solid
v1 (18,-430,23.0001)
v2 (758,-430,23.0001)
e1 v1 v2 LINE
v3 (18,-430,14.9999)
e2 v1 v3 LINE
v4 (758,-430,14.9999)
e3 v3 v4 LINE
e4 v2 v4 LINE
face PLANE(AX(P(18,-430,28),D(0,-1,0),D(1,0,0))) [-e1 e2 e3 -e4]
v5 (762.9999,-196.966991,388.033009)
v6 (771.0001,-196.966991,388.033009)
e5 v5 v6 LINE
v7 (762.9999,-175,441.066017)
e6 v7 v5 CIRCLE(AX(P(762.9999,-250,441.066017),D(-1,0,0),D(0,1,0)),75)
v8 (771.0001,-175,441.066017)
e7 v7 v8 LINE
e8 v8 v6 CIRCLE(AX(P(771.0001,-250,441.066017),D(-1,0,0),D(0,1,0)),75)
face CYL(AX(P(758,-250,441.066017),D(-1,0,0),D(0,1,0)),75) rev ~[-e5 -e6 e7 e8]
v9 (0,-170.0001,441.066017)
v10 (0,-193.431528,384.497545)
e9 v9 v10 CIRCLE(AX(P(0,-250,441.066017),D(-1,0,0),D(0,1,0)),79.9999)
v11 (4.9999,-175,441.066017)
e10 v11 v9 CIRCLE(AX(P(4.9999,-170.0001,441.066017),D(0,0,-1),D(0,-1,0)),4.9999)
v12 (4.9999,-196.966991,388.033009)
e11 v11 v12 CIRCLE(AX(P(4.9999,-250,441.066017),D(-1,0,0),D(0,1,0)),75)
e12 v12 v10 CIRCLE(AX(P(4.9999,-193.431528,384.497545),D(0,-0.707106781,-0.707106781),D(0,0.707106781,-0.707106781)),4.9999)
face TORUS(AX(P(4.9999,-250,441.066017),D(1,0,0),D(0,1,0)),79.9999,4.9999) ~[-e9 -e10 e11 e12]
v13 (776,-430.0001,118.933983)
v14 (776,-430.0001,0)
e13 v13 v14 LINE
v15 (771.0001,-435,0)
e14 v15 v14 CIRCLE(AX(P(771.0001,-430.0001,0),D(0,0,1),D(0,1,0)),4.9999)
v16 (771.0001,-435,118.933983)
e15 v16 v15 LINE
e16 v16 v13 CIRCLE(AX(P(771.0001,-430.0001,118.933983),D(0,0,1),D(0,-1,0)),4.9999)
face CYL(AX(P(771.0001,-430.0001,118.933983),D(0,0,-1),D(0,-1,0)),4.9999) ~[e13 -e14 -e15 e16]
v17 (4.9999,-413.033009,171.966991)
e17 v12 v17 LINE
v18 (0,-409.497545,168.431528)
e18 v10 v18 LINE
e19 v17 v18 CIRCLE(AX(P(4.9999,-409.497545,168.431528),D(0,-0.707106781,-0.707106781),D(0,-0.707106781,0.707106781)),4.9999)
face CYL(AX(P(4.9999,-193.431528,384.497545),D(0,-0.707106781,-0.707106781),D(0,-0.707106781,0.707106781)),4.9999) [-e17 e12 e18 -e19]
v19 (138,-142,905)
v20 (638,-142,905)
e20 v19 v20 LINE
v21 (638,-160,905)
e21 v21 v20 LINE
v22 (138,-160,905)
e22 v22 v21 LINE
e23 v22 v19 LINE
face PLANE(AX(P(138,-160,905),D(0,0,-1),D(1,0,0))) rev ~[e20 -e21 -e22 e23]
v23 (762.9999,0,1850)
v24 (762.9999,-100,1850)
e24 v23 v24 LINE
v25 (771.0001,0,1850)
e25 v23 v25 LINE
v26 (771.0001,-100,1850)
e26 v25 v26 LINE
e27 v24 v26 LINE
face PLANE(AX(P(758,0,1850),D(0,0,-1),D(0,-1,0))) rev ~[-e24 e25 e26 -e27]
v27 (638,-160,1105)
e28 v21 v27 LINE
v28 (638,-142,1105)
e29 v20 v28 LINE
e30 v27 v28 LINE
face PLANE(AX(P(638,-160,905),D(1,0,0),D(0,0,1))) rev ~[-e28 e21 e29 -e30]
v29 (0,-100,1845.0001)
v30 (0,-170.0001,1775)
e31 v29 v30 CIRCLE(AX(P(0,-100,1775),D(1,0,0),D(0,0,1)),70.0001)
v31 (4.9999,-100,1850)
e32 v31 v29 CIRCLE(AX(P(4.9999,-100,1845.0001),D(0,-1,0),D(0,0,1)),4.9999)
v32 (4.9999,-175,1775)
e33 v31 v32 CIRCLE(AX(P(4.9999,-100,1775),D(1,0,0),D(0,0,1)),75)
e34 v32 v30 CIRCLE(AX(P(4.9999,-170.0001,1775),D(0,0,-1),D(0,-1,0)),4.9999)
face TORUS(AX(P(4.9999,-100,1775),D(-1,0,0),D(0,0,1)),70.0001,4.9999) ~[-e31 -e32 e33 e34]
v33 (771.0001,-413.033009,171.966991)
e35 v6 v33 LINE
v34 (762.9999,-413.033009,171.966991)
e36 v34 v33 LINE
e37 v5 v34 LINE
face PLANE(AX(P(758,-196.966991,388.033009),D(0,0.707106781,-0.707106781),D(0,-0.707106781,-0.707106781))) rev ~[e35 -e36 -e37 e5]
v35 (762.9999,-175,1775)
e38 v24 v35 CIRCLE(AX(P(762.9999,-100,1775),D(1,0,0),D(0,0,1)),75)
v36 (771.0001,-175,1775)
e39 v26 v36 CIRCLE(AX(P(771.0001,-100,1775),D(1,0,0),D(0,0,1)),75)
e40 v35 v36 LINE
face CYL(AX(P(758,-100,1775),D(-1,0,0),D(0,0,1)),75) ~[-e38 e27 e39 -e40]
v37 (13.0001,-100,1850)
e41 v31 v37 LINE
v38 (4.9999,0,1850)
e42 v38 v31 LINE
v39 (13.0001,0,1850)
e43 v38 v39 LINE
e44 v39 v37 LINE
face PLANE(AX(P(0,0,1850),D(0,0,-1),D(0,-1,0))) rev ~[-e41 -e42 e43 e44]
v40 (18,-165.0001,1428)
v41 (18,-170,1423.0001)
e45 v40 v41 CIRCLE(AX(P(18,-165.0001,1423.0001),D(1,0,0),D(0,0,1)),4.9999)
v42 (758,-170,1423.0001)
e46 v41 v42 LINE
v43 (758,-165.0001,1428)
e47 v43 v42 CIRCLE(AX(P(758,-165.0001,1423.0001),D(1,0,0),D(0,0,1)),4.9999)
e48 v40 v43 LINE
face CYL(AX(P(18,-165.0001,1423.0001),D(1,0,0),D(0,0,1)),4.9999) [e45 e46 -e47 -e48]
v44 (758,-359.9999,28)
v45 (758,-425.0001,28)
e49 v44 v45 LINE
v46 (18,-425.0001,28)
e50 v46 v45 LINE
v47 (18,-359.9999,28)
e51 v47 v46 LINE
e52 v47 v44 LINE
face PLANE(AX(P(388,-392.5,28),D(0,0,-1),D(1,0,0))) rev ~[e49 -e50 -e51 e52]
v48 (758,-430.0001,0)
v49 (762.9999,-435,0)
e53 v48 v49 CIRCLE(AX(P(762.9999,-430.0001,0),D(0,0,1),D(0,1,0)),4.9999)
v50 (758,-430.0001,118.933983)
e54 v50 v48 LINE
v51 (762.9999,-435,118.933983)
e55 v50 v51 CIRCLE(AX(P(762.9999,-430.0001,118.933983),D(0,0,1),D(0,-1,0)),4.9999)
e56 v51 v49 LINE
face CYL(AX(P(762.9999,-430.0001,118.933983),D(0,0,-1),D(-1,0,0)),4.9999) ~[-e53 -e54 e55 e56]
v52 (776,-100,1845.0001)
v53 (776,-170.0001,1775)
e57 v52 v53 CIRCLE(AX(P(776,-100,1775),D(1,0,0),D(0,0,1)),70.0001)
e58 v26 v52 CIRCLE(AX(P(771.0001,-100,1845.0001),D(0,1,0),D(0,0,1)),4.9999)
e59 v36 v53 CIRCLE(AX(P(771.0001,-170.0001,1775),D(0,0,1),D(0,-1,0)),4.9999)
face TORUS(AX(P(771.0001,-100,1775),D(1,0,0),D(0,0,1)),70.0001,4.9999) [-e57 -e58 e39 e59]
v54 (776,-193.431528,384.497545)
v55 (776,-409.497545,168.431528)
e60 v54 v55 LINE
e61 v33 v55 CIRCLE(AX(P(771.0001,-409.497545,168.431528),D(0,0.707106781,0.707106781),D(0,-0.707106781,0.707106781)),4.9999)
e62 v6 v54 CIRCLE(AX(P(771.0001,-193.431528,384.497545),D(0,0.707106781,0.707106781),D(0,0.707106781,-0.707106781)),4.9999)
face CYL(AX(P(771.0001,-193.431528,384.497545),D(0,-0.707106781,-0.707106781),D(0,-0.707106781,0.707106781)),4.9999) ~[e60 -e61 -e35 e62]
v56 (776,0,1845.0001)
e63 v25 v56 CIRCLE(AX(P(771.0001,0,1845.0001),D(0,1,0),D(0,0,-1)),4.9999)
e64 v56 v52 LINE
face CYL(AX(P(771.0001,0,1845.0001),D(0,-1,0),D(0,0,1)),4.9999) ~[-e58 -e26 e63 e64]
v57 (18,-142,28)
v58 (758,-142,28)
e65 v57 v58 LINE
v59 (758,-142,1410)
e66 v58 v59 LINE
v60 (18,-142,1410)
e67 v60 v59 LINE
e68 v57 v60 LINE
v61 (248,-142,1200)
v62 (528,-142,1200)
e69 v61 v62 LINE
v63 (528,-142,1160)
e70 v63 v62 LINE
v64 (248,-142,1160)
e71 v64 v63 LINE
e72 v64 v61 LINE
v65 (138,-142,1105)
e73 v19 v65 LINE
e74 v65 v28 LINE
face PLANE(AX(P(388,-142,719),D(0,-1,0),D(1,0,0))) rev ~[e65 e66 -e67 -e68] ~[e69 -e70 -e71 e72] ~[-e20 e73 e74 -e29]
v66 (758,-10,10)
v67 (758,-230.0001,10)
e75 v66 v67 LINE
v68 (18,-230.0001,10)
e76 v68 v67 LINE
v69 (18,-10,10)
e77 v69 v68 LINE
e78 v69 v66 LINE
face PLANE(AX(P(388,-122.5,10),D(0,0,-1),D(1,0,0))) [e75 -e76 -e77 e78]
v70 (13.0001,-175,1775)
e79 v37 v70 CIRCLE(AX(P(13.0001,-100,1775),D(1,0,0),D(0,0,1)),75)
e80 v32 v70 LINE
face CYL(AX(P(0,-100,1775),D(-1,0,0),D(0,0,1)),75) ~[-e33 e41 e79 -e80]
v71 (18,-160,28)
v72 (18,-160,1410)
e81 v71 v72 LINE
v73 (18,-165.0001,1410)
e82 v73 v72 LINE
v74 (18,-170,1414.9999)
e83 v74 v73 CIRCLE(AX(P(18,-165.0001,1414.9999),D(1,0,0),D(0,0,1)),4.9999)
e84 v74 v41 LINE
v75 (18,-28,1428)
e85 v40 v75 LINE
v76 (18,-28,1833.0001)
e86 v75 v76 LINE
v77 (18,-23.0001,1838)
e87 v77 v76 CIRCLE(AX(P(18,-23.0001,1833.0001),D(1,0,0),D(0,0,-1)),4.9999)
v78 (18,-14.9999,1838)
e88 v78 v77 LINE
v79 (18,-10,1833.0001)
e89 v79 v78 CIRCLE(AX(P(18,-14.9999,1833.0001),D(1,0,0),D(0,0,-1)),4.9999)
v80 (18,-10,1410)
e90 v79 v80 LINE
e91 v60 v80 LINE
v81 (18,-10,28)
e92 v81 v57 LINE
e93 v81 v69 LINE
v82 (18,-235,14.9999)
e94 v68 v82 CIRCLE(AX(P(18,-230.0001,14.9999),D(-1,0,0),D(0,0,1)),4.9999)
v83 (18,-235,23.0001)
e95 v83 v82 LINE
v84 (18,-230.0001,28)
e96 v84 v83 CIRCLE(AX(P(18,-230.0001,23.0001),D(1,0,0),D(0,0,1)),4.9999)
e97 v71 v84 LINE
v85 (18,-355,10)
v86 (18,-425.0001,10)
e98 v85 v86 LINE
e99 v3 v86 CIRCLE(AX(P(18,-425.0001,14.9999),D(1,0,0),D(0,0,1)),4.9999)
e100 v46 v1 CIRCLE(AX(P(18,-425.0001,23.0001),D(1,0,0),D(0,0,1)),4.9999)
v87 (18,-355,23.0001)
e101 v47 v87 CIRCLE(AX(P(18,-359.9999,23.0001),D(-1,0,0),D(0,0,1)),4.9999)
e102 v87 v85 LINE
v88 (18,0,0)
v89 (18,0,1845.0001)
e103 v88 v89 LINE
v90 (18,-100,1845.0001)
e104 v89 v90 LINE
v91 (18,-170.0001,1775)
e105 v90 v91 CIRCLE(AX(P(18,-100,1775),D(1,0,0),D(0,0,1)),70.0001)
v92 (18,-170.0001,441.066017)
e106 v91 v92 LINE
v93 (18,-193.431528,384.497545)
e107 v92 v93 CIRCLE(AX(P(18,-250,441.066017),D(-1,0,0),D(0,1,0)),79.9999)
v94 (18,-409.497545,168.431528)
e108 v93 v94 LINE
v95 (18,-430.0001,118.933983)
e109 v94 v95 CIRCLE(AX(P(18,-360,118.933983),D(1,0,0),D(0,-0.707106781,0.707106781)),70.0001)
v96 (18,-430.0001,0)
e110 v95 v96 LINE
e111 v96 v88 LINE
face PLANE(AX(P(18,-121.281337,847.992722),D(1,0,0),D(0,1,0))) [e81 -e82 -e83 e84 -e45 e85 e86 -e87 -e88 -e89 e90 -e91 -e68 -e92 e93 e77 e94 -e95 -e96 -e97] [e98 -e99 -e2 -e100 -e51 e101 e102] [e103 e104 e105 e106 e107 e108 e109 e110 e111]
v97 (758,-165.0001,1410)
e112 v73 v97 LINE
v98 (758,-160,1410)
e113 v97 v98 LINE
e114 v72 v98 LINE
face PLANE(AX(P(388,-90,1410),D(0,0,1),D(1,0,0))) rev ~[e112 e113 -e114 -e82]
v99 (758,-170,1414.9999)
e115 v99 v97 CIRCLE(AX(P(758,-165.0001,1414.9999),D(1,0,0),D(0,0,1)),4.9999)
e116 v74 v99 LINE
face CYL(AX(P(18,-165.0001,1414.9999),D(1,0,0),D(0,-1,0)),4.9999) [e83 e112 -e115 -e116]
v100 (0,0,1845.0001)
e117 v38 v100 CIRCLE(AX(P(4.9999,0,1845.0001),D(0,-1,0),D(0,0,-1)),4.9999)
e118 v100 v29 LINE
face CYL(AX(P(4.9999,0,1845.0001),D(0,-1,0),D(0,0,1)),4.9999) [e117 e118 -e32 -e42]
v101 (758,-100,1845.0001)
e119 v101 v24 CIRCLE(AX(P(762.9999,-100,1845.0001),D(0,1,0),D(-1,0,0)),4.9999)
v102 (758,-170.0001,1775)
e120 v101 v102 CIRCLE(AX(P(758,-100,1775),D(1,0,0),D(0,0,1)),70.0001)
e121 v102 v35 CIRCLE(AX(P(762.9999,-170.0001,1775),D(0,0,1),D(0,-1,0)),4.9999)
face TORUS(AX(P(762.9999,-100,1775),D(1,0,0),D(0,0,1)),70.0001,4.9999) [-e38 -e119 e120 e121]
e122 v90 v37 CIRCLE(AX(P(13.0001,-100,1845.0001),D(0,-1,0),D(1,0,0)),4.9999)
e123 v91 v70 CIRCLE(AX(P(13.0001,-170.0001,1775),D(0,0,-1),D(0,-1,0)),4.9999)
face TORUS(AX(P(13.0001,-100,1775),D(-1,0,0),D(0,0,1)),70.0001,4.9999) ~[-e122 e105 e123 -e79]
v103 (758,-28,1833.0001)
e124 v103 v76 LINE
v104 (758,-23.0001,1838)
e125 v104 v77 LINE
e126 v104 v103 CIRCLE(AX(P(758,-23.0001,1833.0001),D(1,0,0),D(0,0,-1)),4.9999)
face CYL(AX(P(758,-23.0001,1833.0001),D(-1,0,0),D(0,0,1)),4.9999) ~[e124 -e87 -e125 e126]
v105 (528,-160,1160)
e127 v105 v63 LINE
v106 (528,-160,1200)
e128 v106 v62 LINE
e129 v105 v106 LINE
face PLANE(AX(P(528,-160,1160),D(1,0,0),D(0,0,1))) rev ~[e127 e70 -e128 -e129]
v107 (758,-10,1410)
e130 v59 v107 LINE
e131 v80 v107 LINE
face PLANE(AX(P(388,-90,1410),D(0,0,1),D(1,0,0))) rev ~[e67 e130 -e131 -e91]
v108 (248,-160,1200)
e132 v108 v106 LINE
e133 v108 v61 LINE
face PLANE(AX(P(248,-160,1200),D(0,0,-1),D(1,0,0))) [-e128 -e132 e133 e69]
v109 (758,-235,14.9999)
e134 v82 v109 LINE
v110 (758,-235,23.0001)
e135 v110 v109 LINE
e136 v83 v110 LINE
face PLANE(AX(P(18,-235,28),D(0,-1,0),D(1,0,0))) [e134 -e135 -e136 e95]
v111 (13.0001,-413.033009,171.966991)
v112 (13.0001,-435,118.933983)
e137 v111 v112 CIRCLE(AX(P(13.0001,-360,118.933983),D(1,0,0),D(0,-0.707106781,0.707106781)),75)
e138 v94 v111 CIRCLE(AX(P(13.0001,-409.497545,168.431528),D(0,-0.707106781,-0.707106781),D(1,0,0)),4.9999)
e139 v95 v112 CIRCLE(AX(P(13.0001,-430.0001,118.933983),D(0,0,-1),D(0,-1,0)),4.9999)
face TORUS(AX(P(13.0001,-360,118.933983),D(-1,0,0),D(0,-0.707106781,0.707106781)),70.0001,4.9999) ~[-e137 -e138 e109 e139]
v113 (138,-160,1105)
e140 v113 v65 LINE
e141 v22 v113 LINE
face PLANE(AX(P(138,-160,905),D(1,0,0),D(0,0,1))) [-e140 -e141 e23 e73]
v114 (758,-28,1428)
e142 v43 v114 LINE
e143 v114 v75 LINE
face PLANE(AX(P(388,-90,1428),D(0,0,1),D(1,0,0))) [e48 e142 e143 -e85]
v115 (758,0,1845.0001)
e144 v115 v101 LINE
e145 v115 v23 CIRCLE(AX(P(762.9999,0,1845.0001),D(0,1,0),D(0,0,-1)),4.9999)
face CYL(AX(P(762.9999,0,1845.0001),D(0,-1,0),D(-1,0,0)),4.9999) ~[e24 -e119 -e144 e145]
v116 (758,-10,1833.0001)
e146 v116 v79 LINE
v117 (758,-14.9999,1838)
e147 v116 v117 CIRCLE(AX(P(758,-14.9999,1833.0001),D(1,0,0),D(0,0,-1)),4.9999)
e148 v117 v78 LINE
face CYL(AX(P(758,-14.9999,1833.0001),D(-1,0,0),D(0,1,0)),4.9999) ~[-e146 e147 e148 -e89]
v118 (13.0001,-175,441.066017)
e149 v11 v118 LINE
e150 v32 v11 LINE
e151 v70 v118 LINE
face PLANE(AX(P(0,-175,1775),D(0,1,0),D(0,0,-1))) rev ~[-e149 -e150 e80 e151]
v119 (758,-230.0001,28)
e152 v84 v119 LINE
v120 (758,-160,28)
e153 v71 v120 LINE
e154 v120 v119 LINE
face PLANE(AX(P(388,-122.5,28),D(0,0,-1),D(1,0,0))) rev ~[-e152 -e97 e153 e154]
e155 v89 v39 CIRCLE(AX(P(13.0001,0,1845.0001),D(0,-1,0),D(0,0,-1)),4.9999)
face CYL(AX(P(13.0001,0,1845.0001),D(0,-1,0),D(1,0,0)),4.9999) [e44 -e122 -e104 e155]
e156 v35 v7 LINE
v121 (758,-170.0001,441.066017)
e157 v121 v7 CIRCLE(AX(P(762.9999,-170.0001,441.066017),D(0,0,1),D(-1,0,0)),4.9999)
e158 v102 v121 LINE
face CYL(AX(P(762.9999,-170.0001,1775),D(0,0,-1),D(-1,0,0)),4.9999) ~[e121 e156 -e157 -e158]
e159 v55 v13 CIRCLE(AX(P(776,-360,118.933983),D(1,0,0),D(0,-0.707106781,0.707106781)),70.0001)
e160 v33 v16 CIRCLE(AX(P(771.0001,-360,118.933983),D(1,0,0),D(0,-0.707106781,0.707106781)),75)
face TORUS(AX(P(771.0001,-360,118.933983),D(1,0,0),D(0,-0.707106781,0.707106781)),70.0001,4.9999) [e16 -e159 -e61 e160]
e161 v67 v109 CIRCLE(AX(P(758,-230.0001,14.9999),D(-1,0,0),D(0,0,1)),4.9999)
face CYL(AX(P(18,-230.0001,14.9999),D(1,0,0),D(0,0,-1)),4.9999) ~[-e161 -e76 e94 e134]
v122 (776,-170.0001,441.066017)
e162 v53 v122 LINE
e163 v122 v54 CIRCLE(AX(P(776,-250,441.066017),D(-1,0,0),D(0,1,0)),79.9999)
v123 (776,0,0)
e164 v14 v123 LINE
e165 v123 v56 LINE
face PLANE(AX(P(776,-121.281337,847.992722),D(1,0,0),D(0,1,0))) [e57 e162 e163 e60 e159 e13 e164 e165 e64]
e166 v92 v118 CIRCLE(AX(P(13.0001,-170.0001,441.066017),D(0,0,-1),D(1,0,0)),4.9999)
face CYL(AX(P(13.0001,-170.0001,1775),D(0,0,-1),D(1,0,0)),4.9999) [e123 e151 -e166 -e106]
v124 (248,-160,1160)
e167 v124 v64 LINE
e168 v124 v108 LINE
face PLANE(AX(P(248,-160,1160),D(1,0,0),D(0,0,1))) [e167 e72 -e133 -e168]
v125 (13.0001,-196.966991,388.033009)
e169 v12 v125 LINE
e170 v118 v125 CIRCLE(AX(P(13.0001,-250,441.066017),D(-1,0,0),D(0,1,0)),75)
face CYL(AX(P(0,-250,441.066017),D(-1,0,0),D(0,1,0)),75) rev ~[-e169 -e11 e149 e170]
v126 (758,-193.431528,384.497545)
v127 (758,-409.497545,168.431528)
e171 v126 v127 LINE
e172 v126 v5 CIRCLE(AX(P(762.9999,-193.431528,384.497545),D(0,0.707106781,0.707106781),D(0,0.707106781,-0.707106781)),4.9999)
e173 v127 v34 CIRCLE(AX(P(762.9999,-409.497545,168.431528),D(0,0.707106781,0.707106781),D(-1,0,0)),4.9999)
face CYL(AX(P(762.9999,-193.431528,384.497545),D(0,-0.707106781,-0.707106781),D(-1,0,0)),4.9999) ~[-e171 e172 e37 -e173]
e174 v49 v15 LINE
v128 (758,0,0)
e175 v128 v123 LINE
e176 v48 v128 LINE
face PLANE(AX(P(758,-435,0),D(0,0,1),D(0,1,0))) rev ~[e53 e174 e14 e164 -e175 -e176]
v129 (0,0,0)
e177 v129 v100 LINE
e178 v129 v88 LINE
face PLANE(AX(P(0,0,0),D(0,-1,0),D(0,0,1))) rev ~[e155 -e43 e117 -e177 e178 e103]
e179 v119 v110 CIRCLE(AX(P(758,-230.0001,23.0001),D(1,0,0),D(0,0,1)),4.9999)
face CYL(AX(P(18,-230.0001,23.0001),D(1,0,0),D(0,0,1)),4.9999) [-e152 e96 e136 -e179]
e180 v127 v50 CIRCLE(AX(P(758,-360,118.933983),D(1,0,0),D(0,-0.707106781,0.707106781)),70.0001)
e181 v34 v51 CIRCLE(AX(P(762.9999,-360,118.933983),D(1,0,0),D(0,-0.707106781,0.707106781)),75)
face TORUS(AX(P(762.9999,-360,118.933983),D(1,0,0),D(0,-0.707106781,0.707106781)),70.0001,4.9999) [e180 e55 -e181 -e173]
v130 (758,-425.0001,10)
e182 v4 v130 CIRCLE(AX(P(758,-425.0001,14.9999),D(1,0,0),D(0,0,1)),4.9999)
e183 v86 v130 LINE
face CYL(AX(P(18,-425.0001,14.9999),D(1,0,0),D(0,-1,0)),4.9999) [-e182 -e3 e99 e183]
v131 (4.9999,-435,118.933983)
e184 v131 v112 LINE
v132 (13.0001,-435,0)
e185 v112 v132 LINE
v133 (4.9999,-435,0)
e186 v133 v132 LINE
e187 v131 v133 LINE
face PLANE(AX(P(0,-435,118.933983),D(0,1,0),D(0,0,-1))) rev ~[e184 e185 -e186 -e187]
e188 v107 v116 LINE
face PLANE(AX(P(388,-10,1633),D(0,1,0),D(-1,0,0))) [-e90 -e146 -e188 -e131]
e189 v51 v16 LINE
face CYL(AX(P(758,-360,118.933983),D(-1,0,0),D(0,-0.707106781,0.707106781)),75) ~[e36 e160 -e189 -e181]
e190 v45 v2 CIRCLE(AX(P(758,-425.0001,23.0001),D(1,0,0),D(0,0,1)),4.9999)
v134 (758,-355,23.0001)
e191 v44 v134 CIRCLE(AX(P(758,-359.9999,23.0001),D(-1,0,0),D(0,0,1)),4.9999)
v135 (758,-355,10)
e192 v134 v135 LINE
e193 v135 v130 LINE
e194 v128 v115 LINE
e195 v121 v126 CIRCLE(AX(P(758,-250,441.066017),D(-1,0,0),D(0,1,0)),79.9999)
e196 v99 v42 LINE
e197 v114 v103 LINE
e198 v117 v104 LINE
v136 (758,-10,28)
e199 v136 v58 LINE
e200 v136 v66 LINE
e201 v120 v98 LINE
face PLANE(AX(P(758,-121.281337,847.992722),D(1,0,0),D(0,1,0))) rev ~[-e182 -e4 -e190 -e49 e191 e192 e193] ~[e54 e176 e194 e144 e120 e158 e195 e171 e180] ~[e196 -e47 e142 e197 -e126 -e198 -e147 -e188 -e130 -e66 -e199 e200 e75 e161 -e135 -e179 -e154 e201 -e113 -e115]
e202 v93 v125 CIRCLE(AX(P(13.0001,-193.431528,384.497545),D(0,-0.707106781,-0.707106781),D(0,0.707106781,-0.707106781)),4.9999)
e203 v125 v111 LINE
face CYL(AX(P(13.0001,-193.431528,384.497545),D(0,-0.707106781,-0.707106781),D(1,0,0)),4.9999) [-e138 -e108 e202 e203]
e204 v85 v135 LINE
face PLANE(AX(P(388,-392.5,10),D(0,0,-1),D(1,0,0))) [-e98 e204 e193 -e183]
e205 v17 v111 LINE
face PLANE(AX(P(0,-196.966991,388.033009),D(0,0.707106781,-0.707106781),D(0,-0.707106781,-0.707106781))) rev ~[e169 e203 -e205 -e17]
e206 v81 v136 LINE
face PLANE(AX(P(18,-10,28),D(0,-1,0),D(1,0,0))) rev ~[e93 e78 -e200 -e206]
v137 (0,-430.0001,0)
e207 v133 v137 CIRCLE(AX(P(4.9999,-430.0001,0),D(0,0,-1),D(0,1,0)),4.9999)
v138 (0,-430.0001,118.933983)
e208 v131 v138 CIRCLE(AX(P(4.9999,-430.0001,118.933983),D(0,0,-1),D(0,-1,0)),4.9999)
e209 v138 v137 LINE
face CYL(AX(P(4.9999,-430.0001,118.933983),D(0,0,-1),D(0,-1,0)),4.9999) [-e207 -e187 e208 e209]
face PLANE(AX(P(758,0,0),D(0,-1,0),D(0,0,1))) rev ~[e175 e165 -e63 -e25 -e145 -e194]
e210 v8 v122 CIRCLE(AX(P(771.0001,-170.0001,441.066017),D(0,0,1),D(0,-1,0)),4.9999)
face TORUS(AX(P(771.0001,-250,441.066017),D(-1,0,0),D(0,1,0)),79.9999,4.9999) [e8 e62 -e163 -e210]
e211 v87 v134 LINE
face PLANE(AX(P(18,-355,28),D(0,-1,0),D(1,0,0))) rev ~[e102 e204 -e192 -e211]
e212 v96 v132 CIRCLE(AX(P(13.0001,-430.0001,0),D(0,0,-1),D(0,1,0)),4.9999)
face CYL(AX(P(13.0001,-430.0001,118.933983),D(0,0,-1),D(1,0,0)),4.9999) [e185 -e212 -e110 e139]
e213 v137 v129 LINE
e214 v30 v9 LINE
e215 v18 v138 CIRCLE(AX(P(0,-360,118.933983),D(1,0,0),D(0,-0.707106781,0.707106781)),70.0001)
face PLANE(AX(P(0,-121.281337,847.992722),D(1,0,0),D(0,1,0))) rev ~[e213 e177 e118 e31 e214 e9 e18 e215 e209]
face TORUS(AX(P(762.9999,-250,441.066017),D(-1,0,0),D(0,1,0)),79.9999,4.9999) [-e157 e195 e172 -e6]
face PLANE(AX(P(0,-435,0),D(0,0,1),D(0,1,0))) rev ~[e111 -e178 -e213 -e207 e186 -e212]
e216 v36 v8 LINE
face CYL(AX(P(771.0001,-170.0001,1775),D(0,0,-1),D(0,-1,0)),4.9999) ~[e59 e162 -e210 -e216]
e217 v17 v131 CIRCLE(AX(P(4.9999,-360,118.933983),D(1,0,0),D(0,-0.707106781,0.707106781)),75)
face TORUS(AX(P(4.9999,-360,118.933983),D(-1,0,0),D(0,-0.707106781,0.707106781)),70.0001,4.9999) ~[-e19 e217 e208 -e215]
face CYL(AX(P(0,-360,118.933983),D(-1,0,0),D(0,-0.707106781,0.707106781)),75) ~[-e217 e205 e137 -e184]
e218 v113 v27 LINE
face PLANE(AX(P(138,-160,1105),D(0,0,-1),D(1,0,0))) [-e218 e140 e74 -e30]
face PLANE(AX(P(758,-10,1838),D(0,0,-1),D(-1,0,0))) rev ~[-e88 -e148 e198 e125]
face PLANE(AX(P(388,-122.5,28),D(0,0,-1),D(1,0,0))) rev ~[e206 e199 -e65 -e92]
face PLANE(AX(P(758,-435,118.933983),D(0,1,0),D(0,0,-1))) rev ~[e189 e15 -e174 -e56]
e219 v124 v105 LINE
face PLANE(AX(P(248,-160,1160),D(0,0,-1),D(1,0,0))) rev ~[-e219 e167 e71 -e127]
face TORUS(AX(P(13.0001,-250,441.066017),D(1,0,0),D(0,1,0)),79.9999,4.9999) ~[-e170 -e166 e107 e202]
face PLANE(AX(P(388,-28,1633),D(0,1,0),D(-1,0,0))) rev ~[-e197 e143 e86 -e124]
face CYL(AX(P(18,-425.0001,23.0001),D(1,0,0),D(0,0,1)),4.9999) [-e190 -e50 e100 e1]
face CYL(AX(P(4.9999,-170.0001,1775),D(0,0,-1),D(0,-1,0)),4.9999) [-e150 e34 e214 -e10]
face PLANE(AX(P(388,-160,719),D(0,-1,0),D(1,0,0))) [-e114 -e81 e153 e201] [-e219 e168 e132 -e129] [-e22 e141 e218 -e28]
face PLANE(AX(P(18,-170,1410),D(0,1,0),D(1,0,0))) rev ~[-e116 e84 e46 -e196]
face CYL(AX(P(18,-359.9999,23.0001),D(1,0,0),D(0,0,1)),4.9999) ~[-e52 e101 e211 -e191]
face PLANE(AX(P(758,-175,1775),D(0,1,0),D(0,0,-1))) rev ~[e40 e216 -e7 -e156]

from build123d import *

# Parameters (mm, degrees)
F1_DEPTH  = 18
F3_W      = 740
F3_H      = 1382
F3_W_2    = 500
F3_H_2    = 200
F3_W_3    = 280
F3_H_3    = 40
F4_DEPTH  = 18
F7_DEPTH  = 18
F9_W      = 740
F9_H      = 160
F10_DEPTH = 18
F12_W     = 740
F12_H     = 410
F13_DEPTH = 18
F15_W     = 740
F15_H     = 225
F15_H_2   = 75
F16_DEPTH = 18
F17_R     = 4.9999


# Not quite as in the source:
# - a fillet or chamfer is up to 0.001 mm smaller than in the source, because OpenCascade refuses the exact size


with BuildPart() as f1:
    # F0 (on Right) → F1 (new body)
    with BuildSketch(Plane.YZ):
        with BuildLine():
            Line((-435, 0), (0, 0))
            Line((0, 0), (0, 1850))
            Line((0, 1850), (-100, 1850))
            ThreePointArc((-100, 1850), (-153.033008589, 1828.033008589), (-175, 1775))
            Line((-175, 1775), (-175, 441.066017178))
            ThreePointArc((-175, 441.066017178), (-180.7090350617, 412.3647597506), (-196.966991411, 388.033008589))
            Line((-196.966991411, 388.033008589), (-413.033008589, 171.966991411))
            ThreePointArc((-413.033008589, 171.966991411), (-429.2909649383, 147.6352402494), (-435, 118.933982822))
            Line((-435, 118.933982822), (-435, 0))
        make_face()
    extrude(amount=F1_DEPTH)

    # F3 (on offset) → F4 (join)
    with BuildSketch(Plane.XZ.offset(160)):
        with Locations((388, 719)):
            Rectangle(F3_W, F3_H)
        with Locations((388, 1005)):
            Rectangle(F3_W_2, F3_H_2, mode=Mode.SUBTRACT)
        with Locations((388, 1180)):
            Rectangle(F3_W_3, F3_H_3, mode=Mode.SUBTRACT)
    extrude(amount=-F4_DEPTH)

    # F6 (on offset) → F7 (join)
    with BuildSketch(Plane.YZ.offset(758)):
        with BuildLine():
            Line((-435, 0), (0, 0))
            Line((0, 0), (0, 1850))
            Line((0, 1850), (-100, 1850))
            ThreePointArc((-100, 1850), (-153.033008589, 1828.033008589), (-175, 1775))
            Line((-175, 1775), (-175, 441.066017178))
            ThreePointArc((-175, 441.066017178), (-180.7090350617, 412.3647597506), (-196.966991411, 388.033008589))
            Line((-196.966991411, 388.033008589), (-413.033008589, 171.966991411))
            ThreePointArc((-413.033008589, 171.966991411), (-429.2909649383, 147.6352402494), (-435, 118.933982822))
            Line((-435, 118.933982822), (-435, 0))
        make_face()
    extrude(amount=F7_DEPTH)

    # F9 (on offset) → F10 (join)
    with BuildSketch(Plane.XY.offset(1410)):
        with Locations((388, -90)):
            Rectangle(F9_W, F9_H)
    extrude(amount=F10_DEPTH)

    # F12 (on offset) → F13 (join)
    with BuildSketch(Plane(origin=(0, -10, 0), x_dir=(-1, 0, 0), z_dir=(0, 1, 0))):
        with Locations((-388, 1633)):
            Rectangle(F12_W, F12_H)
    extrude(amount=-F13_DEPTH)

    # F15 (on offset) → F16 (join)
    with BuildSketch(Plane(origin=(0, 0, 28), x_dir=(1, 0, 0), z_dir=(0, 0, -1))):
        with Locations((388, 122.5)):
            Rectangle(F15_W, F15_H)
        with Locations((388, 392.5)):
            Rectangle(F15_W, F15_H_2)
    extrude(amount=F16_DEPTH)

    # F17 (radius 5 in the source; OpenCascade refuses exactly that, so slightly less here)
    f17_edges = [f1.edges().sort_by_distance(p)[0] for p in [
        (388, -170, 1428),
        (388, -170, 1410),
        (758, -175, 1108.033009),
        (776, -175, 1108.033009),
        (388, -28, 1838),
        (388, -10, 1838),
        (18, -50, 1850),
        (0, -50, 1850),
        (388, -235, 28),
        (388, -355, 28),
        (388, -430, 28),
        (388, -430, 10),
        (388, -235, 10),
    ]]
    fillet(f17_edges, radius=F17_R)


solid = f1.part
